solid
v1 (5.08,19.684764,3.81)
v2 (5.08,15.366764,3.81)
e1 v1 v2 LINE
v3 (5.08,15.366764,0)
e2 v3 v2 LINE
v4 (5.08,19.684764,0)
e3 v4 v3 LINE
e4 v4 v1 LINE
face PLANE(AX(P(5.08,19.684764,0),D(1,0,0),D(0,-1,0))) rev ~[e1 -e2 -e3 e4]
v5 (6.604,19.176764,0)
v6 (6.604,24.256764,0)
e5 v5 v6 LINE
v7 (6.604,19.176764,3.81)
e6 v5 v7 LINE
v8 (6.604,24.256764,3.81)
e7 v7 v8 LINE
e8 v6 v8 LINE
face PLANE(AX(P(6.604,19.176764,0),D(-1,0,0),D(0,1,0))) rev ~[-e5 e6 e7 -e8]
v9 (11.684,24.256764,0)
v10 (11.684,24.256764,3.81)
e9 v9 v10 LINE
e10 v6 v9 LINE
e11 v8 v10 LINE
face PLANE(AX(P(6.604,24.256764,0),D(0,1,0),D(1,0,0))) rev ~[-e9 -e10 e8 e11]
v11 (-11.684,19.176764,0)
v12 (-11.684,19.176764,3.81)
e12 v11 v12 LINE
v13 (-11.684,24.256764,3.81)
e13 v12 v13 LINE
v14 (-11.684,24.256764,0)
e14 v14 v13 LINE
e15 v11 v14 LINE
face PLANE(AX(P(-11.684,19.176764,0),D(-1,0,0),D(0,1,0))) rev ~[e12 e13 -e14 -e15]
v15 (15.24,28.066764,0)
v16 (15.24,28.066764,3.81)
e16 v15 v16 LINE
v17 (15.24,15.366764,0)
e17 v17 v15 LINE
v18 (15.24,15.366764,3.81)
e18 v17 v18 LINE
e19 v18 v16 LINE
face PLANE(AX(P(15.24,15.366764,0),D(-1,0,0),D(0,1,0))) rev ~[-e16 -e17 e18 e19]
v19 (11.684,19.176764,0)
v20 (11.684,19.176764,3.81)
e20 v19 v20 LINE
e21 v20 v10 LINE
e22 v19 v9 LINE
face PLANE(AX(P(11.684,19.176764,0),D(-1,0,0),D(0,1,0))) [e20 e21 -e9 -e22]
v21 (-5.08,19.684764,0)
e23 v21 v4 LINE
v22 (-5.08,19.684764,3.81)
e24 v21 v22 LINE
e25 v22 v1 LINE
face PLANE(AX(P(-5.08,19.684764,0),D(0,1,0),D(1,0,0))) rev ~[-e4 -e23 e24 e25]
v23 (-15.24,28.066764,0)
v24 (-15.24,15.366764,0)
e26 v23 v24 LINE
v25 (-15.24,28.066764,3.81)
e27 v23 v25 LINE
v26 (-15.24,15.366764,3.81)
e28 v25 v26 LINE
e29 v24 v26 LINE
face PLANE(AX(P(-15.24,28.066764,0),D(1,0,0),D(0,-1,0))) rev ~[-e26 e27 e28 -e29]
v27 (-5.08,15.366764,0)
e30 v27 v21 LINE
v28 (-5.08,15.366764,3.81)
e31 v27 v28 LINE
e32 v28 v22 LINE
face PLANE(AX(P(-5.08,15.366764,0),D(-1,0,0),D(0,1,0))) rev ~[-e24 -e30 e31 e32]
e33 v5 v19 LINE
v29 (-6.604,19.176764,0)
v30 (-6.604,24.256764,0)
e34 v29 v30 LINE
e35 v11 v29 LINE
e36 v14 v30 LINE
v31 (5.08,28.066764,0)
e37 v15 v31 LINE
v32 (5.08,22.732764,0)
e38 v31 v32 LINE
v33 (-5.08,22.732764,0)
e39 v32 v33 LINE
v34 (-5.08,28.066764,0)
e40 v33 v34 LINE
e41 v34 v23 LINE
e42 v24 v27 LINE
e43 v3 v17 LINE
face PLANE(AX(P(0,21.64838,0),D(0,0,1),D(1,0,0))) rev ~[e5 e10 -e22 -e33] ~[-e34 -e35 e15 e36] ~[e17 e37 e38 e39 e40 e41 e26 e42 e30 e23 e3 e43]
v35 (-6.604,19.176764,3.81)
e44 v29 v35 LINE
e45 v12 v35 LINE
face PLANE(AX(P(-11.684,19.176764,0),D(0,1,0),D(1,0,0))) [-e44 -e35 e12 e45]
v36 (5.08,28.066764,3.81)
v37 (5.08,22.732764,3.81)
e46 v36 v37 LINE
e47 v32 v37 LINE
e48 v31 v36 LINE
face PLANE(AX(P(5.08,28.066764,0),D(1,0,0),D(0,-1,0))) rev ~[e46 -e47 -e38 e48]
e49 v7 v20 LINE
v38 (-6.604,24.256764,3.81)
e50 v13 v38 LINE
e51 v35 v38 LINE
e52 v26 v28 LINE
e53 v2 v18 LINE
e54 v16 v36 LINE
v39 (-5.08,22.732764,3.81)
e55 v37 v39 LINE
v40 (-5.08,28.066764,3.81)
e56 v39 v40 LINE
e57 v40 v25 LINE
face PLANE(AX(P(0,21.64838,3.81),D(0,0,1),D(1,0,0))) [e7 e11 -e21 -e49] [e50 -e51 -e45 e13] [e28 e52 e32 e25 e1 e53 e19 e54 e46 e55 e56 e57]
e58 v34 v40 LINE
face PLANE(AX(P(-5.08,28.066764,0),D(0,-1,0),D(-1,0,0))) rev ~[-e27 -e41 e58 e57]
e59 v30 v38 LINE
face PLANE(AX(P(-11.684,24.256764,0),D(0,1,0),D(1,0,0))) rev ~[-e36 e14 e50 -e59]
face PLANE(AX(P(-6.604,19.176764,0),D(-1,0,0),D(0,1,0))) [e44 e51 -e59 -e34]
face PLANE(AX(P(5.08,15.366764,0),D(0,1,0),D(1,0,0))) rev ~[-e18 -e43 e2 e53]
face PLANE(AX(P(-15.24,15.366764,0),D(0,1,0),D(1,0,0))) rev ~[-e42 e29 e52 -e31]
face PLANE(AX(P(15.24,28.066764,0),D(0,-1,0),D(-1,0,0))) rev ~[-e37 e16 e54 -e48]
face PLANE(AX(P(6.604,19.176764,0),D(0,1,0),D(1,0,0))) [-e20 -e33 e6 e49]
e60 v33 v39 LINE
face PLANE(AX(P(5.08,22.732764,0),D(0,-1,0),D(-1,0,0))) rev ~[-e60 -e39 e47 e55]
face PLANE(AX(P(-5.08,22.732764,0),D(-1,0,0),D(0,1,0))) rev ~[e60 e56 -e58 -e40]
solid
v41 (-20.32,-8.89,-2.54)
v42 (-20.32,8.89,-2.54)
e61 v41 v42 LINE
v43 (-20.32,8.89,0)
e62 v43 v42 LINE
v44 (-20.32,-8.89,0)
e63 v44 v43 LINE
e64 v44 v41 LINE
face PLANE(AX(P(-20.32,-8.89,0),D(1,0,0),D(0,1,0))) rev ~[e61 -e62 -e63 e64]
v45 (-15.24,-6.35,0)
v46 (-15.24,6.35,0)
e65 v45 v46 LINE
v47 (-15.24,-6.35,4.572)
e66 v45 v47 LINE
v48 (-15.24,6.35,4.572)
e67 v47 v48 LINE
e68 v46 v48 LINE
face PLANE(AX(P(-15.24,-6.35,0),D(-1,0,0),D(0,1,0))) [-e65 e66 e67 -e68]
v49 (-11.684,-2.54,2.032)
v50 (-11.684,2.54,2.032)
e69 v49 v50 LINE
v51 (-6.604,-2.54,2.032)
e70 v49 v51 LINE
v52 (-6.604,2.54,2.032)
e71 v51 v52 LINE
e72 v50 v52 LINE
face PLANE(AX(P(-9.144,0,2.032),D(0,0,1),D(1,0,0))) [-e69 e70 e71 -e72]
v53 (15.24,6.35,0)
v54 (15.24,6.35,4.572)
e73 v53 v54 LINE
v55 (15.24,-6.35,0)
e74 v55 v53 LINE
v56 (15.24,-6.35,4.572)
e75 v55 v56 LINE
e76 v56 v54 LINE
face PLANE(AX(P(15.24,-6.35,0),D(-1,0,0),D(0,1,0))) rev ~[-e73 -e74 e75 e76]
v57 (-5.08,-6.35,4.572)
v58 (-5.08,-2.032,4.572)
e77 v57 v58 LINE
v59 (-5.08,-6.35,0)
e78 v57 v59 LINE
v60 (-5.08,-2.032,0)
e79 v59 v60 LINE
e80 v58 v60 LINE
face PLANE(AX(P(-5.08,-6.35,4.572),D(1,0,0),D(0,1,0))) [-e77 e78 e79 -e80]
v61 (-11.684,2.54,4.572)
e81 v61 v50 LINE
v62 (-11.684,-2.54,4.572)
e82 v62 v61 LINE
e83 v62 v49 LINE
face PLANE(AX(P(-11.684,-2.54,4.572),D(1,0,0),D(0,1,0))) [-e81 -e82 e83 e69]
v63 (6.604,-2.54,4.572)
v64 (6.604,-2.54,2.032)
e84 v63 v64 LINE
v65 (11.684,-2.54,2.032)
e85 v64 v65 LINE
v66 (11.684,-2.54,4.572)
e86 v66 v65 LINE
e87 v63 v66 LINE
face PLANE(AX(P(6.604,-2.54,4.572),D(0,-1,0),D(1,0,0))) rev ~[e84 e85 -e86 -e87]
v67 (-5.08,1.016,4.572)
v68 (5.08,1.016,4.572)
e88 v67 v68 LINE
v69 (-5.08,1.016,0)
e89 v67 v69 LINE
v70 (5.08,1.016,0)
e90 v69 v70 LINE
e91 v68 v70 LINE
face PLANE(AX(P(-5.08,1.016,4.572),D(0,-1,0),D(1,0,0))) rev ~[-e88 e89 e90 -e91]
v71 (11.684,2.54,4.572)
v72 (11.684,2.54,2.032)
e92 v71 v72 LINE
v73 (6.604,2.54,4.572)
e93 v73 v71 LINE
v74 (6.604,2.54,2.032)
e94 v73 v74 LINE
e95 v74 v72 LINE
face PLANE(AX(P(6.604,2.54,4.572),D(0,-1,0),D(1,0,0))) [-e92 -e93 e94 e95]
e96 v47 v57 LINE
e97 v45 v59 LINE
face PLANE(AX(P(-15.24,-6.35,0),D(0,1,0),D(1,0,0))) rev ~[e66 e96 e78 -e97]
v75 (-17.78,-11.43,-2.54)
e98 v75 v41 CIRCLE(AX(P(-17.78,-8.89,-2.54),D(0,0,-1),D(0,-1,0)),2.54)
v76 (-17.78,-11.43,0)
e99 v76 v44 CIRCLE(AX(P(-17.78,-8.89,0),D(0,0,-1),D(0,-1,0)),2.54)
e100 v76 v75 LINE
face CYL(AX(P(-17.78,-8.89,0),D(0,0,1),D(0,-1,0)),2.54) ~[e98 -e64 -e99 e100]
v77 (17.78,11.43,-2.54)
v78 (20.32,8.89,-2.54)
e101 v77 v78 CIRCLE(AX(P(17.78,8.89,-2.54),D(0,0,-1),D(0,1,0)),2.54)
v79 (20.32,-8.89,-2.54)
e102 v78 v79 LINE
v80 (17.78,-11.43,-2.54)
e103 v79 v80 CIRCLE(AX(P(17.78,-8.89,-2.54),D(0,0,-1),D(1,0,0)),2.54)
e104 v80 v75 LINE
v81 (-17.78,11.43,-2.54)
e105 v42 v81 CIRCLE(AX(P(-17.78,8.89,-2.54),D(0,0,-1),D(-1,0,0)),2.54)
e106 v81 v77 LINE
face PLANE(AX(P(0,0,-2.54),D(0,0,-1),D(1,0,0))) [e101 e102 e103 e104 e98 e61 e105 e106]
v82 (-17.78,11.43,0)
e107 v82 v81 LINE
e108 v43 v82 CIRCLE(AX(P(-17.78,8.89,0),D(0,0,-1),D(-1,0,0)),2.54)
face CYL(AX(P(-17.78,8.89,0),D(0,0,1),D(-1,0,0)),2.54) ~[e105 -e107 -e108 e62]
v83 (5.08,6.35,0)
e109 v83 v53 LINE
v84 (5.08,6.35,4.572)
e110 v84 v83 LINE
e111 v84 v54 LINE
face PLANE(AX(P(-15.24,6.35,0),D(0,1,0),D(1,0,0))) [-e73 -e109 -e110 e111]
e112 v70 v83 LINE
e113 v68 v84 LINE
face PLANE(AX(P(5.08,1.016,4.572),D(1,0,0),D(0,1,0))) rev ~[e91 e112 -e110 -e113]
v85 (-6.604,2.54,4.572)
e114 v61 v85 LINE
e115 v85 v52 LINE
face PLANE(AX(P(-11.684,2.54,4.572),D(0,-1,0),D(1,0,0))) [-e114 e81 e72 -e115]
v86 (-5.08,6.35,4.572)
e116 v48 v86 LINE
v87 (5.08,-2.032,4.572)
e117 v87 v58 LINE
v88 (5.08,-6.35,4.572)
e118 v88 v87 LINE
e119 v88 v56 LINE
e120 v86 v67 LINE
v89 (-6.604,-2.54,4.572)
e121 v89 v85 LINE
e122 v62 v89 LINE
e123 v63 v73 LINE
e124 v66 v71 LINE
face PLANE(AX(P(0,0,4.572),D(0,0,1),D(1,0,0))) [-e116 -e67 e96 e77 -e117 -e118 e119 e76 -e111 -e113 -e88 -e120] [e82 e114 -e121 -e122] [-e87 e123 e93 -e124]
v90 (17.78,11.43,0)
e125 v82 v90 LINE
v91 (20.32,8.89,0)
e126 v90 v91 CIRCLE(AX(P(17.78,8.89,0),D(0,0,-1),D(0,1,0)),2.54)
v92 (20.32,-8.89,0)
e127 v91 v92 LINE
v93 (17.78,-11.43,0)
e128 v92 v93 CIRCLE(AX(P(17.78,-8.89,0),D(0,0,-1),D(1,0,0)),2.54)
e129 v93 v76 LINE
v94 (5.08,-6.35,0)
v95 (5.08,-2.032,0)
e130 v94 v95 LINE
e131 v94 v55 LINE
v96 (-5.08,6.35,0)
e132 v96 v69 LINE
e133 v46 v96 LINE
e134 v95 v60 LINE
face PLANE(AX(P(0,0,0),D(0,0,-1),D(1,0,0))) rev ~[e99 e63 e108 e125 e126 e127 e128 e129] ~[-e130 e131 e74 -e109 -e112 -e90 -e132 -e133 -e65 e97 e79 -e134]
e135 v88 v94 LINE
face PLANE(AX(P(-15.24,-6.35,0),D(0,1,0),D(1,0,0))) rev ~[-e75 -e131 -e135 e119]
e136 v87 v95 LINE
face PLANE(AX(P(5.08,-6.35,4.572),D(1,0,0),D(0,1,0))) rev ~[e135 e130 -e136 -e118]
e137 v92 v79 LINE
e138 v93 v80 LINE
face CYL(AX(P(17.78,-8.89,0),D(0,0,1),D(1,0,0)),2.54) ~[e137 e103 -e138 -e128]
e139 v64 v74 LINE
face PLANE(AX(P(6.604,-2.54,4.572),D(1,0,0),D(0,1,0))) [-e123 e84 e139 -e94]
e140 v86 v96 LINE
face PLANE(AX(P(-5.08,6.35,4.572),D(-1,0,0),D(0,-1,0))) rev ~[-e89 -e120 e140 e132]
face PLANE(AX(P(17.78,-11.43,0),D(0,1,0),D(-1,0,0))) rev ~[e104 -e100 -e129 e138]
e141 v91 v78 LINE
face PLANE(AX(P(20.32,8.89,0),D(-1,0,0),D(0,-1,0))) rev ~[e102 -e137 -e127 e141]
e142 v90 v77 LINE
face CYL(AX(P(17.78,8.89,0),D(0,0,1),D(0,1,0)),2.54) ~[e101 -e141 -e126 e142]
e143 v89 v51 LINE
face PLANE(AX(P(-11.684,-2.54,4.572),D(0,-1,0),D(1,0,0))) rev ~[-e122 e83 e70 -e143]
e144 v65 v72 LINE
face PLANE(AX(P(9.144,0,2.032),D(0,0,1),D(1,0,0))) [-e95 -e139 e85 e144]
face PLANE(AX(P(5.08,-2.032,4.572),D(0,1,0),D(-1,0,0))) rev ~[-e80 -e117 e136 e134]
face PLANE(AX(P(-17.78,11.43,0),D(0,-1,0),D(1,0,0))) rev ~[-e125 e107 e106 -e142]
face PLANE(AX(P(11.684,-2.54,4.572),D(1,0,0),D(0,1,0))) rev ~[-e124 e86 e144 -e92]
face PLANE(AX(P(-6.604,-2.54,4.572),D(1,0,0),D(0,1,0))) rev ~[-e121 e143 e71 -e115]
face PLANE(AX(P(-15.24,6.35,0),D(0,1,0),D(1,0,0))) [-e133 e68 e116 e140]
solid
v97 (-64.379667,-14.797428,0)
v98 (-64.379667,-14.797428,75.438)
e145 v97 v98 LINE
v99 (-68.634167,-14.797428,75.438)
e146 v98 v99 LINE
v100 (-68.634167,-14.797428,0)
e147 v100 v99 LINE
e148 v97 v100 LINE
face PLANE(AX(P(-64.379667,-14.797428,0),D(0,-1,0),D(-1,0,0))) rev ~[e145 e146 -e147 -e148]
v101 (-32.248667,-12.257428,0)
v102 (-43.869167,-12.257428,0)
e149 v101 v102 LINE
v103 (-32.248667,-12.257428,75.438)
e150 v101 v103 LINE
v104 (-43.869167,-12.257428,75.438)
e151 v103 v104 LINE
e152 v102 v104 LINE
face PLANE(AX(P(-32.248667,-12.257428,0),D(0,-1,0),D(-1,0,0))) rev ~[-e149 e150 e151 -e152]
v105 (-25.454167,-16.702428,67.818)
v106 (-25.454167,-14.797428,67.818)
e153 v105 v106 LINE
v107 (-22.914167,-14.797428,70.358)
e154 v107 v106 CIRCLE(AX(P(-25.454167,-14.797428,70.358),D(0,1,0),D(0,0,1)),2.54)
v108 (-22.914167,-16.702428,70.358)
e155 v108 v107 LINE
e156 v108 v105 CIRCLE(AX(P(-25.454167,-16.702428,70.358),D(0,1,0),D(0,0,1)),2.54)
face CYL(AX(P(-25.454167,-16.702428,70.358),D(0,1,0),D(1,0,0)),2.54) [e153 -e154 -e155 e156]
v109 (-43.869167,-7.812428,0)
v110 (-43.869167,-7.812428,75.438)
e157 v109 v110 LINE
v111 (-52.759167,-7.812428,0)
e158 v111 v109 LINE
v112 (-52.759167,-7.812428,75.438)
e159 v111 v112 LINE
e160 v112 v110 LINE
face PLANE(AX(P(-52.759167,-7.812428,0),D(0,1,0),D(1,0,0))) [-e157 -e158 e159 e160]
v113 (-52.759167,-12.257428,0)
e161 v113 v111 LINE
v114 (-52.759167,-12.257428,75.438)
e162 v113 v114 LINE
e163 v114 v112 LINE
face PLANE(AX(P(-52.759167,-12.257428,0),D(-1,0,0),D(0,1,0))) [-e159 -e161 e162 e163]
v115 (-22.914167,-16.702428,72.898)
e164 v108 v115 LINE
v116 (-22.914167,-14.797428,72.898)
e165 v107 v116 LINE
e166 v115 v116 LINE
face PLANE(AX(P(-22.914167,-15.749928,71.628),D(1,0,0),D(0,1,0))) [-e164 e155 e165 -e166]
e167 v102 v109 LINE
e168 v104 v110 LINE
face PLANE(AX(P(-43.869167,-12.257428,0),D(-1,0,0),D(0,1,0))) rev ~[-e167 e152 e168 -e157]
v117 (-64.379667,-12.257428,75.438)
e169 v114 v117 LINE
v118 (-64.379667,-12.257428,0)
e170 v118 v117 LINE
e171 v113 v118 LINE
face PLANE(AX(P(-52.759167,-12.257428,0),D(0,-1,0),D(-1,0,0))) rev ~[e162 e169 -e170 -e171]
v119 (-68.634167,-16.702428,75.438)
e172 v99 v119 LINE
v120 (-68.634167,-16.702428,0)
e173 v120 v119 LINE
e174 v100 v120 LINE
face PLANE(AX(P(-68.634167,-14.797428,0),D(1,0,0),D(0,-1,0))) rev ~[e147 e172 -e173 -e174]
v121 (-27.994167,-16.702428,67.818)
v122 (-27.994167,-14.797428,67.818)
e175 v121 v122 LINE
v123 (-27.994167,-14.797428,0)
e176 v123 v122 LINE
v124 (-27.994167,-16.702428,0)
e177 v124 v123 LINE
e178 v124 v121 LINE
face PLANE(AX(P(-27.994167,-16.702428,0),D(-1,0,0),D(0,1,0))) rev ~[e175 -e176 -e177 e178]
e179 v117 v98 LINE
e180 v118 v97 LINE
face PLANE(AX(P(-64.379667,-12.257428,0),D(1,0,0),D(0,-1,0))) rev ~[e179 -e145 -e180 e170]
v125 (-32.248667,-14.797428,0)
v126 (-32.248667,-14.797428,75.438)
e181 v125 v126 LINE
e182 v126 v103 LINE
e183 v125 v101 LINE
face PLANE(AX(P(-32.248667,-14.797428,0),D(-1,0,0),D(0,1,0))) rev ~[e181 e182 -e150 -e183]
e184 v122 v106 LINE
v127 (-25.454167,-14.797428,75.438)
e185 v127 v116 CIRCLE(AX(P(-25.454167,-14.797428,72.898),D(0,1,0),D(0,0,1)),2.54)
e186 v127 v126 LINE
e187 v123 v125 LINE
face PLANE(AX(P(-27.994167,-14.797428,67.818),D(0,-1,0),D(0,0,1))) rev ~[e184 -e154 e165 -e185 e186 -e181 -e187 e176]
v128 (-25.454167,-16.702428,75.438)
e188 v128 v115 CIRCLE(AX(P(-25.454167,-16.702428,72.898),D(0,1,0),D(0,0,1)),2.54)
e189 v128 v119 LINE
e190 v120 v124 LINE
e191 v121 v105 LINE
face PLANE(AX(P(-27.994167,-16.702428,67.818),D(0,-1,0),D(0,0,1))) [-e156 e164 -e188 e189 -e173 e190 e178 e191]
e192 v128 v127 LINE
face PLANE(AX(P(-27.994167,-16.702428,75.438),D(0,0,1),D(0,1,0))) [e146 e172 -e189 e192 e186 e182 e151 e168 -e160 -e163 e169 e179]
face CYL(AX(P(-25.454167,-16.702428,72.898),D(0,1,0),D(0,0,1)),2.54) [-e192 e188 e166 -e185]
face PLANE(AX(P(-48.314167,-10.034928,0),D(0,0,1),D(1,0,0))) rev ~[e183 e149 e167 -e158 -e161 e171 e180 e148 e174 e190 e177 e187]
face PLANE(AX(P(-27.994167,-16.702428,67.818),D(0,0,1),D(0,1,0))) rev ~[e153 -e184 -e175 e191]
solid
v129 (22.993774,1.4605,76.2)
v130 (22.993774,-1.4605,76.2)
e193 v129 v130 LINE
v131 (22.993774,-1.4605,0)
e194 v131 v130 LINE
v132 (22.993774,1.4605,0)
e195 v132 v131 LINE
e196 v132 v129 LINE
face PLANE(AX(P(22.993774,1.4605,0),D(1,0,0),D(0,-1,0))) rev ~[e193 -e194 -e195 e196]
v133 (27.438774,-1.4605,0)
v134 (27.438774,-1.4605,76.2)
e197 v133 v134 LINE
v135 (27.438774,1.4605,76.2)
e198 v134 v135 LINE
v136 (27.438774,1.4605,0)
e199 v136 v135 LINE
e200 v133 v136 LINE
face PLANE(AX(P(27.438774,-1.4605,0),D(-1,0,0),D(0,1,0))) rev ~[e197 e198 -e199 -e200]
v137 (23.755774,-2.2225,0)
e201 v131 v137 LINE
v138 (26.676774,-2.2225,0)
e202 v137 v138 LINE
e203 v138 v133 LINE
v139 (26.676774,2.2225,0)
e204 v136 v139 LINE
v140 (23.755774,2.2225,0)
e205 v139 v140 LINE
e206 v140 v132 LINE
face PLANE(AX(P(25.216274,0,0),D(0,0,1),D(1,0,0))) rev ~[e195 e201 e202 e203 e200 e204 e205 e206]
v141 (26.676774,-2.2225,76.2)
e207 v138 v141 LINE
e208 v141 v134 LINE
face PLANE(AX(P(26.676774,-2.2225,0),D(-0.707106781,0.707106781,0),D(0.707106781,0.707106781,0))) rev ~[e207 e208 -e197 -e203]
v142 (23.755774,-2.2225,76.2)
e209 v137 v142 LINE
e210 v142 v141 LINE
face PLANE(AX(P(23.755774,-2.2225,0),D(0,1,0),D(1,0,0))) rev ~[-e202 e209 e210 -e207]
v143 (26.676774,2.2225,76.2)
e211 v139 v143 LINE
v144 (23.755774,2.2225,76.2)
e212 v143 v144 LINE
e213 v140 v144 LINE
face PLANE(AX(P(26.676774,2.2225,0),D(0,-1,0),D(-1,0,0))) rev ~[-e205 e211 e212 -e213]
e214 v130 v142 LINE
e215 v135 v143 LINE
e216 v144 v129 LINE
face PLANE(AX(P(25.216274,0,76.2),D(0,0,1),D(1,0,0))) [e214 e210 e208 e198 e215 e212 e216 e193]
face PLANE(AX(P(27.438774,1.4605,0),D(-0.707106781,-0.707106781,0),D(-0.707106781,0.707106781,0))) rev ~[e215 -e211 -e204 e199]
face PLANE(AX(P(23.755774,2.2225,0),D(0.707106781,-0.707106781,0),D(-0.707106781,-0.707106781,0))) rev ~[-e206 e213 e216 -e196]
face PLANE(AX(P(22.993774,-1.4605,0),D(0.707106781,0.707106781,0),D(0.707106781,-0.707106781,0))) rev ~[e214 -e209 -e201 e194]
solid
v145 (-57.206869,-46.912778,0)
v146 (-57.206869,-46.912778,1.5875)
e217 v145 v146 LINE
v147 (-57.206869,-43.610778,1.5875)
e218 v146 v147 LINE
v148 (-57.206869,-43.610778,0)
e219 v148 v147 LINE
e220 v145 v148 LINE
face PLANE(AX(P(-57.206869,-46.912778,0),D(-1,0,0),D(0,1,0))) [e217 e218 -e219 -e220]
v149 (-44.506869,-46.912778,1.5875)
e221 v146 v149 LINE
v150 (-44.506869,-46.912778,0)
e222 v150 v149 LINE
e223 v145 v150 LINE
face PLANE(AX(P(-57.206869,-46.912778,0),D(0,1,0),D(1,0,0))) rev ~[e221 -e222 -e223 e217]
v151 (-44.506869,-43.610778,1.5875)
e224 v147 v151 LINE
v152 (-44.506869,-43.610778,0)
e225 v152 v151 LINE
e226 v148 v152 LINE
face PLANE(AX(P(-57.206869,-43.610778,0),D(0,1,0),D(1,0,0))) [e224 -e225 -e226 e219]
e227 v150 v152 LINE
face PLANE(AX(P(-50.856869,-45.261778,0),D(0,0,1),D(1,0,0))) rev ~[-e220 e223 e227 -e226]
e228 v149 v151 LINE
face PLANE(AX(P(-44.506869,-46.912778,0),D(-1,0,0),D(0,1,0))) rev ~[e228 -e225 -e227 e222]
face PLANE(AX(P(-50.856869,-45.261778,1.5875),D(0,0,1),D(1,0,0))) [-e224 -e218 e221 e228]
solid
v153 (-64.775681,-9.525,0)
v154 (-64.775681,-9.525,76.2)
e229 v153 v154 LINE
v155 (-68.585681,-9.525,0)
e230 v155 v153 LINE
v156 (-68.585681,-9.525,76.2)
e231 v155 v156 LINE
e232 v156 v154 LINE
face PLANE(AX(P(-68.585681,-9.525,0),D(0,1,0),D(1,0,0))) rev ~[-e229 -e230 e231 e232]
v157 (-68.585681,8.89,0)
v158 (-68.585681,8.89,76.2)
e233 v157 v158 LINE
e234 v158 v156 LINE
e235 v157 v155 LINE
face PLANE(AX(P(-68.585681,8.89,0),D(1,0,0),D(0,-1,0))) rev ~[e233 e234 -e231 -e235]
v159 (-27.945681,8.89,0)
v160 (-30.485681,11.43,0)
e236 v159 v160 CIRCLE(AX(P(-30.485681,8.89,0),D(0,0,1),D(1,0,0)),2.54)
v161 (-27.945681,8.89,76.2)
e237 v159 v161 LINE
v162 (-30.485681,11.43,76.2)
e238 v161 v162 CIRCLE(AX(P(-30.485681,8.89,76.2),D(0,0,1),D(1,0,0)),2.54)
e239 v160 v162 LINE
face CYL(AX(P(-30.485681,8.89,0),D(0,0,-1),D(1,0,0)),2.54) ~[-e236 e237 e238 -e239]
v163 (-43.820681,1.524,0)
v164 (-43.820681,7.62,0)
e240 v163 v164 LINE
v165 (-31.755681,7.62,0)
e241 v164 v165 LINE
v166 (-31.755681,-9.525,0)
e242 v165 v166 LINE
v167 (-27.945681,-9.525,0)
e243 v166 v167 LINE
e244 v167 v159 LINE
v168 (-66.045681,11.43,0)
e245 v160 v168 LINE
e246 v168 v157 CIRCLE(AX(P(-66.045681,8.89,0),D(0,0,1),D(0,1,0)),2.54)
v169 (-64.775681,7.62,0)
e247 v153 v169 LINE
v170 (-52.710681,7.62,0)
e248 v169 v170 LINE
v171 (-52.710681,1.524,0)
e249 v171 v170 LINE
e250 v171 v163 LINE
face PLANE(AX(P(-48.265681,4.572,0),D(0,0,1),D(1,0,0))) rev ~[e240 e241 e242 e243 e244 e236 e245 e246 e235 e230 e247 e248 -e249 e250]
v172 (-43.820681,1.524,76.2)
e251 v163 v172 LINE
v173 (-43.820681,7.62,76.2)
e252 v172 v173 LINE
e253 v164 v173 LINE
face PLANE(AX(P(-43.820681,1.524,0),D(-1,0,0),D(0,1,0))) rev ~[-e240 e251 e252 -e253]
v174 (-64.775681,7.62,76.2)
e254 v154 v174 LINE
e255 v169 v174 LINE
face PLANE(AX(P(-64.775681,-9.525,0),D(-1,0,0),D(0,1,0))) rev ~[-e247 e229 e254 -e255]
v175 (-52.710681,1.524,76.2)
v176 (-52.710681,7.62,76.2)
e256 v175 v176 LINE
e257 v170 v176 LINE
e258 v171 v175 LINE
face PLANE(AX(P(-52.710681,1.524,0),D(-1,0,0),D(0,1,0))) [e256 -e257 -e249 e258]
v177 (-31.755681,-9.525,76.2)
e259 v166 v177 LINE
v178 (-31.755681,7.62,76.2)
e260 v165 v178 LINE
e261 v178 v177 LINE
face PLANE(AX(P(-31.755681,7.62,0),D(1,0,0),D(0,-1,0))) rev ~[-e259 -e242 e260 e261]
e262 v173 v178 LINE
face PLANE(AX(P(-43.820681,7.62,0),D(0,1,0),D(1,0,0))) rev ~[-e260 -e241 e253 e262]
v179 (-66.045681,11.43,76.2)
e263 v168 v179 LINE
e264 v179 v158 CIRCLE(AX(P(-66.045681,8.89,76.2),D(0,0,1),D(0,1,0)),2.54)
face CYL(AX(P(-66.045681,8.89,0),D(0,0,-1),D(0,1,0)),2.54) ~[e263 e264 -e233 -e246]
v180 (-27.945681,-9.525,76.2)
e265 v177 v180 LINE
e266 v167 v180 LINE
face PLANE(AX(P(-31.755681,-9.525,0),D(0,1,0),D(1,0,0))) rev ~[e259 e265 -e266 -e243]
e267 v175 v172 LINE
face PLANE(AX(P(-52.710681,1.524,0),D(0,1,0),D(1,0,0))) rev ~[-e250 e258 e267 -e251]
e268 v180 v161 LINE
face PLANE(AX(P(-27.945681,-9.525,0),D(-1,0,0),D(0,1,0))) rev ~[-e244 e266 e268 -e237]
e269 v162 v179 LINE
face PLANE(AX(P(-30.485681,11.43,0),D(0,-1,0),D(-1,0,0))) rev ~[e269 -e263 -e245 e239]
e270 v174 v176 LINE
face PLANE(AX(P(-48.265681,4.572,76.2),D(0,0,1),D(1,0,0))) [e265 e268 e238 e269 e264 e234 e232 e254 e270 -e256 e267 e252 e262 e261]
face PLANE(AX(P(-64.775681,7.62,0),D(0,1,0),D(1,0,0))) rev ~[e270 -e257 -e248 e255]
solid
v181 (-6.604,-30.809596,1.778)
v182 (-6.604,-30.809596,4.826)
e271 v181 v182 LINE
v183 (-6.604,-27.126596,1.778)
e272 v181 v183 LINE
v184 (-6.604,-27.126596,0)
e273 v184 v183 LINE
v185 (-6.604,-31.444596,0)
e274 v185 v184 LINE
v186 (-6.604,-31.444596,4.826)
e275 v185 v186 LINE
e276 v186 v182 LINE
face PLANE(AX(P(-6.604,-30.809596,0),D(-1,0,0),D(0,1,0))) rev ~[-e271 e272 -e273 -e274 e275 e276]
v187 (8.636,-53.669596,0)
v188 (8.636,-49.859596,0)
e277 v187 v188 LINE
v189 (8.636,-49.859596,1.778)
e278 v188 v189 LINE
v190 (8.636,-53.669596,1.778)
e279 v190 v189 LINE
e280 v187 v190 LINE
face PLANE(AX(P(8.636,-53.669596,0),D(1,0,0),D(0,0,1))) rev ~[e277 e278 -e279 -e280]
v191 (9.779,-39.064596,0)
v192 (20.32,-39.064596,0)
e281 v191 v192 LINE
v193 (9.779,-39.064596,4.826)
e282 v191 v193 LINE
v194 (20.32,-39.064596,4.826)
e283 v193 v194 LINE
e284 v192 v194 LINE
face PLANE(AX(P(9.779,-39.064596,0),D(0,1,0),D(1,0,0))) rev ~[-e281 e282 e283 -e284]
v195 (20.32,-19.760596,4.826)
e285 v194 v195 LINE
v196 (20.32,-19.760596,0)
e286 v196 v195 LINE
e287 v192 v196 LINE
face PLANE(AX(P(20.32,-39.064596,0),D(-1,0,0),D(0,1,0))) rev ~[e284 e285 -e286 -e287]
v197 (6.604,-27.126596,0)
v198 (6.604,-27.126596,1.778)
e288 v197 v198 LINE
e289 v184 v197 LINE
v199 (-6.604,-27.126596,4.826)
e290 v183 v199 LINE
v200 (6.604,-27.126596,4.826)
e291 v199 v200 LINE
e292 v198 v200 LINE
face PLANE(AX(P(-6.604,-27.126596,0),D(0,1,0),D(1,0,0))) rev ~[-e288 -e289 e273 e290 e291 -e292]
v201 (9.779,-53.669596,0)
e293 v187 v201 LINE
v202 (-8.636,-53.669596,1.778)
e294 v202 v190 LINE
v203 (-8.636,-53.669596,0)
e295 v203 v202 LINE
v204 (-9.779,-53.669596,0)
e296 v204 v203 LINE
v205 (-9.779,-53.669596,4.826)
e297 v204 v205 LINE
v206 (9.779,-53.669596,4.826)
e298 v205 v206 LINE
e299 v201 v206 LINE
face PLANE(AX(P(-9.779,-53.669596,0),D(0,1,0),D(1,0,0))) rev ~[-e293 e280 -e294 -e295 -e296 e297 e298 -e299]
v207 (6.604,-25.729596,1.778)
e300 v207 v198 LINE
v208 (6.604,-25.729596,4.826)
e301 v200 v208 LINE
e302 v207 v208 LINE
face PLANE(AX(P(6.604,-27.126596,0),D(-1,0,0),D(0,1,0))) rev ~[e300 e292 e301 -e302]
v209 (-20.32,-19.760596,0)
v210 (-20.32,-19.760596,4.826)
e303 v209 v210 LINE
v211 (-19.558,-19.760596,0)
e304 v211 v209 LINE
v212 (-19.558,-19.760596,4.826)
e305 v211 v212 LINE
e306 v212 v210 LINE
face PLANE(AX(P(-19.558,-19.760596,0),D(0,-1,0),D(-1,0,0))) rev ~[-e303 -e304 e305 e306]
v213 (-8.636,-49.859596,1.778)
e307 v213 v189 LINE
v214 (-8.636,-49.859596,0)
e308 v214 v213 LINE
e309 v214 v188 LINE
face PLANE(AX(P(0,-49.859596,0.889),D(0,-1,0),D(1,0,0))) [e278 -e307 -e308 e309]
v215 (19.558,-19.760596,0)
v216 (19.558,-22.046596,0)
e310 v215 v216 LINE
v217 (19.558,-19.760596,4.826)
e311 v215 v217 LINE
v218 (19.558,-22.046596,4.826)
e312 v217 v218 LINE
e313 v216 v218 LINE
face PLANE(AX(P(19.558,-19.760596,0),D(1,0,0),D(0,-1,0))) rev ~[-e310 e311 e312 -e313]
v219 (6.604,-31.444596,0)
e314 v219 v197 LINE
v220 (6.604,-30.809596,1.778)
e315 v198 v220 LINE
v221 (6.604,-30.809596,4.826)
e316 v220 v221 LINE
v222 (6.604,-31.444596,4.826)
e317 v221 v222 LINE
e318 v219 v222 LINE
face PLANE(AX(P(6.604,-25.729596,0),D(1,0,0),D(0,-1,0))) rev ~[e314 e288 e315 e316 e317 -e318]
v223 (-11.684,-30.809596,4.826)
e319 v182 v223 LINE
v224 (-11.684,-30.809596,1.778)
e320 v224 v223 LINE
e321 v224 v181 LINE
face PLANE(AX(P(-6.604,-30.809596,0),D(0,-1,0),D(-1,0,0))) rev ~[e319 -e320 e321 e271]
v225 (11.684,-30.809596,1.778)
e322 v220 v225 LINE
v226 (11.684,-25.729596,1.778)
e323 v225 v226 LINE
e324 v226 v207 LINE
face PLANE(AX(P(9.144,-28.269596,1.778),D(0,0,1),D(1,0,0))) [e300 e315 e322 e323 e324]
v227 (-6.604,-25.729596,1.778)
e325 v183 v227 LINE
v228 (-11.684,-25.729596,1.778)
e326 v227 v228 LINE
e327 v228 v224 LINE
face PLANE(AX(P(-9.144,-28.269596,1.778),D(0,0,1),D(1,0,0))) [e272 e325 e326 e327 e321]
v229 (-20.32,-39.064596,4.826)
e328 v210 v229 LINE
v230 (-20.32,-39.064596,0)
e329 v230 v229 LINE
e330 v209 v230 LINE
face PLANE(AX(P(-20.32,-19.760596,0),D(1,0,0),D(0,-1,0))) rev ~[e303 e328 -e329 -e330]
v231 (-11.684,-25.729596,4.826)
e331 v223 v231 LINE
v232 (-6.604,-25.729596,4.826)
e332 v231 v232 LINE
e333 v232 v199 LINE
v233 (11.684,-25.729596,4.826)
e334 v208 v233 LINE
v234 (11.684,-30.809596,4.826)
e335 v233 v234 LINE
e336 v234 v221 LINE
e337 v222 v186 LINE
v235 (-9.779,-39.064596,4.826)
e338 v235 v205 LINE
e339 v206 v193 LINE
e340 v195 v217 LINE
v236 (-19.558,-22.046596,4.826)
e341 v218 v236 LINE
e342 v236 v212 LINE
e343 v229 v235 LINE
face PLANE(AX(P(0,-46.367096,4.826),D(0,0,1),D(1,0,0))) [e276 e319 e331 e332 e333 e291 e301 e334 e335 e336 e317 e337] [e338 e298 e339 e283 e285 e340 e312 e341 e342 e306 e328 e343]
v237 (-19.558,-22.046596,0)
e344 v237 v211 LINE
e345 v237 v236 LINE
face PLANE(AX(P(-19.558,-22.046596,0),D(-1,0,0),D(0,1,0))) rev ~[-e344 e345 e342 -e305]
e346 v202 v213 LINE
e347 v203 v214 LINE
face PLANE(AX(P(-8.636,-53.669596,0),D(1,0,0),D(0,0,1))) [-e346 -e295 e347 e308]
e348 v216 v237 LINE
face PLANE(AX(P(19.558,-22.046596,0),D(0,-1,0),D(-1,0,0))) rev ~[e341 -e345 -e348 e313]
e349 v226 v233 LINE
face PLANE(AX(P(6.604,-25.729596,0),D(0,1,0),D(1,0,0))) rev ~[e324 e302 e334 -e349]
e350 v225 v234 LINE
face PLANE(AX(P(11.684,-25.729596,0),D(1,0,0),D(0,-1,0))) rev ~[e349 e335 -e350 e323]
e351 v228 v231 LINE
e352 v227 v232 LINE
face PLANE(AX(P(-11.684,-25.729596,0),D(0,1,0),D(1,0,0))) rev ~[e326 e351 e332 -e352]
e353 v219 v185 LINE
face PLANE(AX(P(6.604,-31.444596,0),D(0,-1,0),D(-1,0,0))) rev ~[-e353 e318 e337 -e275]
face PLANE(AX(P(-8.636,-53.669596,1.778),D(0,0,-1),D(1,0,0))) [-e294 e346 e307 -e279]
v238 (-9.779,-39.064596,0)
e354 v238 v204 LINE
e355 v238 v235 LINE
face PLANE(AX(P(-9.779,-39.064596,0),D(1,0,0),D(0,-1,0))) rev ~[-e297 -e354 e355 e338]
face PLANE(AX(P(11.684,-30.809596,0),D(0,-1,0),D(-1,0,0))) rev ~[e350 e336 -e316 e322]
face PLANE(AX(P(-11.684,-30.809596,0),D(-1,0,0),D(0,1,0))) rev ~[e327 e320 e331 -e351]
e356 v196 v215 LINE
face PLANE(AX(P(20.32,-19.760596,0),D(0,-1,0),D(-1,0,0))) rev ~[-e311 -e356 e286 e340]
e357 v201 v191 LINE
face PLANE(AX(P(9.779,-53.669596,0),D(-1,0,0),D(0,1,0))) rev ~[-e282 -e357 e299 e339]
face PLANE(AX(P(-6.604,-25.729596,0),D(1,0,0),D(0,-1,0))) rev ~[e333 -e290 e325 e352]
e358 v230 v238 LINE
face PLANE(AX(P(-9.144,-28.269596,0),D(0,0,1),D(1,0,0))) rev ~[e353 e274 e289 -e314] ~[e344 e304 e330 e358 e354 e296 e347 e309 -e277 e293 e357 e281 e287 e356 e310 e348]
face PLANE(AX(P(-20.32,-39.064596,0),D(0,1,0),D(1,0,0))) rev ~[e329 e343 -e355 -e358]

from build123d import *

# Parameters (mm, degrees)
F0_W      = 30.48
F0_H      = 12.7
F1_DEPTH  = 4.572
F2_W      = 5.08
F2_H      = 5.08
F3_DEPTH  = 2.54
F2_H_2    = 1.524
F2_H_3    = 3.81
F2_H_4    = 4.318
F4_DEPTH  = 7.62
F6_DEPTH  = 2.54
F8_DEPTH  = 76.2
F9_W      = 5.08
F9_H      = 5.08
F10_DEPTH = 3.81
F11_W     = 8.89
F11_H     = 6.096
F12_DEPTH = 76.2
F14_DEPTH = 4.826
F15_DEPTH = 1.778
F16_W     = 17.272
F16_H     = 1.778
F17_DEPTH = 3.81
F18_W     = 12.7
F18_H     = 3.302
F19_DEPTH = 1.5875
F20_W     = 8.89
F20_H     = 4.445
F21_DEPTH = 75.438
F22_W     = 1.905
F22_H     = 7.62
F23_DEPTH = 5.08
F24_R     = 2.54
F25_R     = 2.54


# Not quite as in the source:
# - a feature names something its author has since deleted; it is built from what else it names


with BuildPart() as f1:
    # F0 (on Top) → F1 (new body)
    with BuildSketch(Plane.XY):
        Rectangle(F0_W, F0_H)
    extrude(amount=F1_DEPTH)

    # F2 (on face) → F3 (cut)
    with BuildSketch(Plane.XY.offset(4.572)):
        with Locations((-9.144, 0)):
            Rectangle(F2_W, F2_H)
        with Locations((9.144, 0)):
            Rectangle(F2_W, F2_H)
    extrude(amount=-F3_DEPTH, mode=Mode.SUBTRACT)

    # F2 (on face) → F4 (cut)
    with BuildSketch(Plane.XY.offset(4.572)):
        with Locations((-2.54, 1.778)):
            Rectangle(F2_W, F2_H_2)
        with Locations((-2.54, 4.445)):
            Rectangle(F2_W, F2_H_3)
        Polygon((5.08, 6.35), (0, 6.35), (0, 2.54), (0, 1.016), (5.08, 1.016), align=None)
        with Locations((2.54, -4.191)):
            Rectangle(F2_W, F2_H_4)
        with Locations((-2.54, -4.191)):
            Rectangle(F2_W, F2_H_4)
    extrude(amount=-F4_DEPTH, mode=Mode.SUBTRACT)

    # F5 (on face) → F6 (join)
    with BuildSketch(Plane(origin=(0, 0, 0), x_dir=(1, 0, 0), z_dir=(0, 0, -1))):
        with BuildLine():
            Line((-20.32, -6.8208193406), (-20.32, -8.89))
            ThreePointArc((-20.32, -8.89), (-19.5760512242, -10.6860512242), (-17.78, -11.43))
            Line((-17.78, -11.43), (-17.2756779939, -11.43))
            Line((-17.2756779939, -11.43), (17.78, -11.43))
            ThreePointArc((17.78, -11.43), (19.5760512242, -10.6860512242), (20.32, -8.89))
            Line((20.32, -8.89), (20.32, 0))
            Line((20.32, 0), (20.32, 8.89))
            ThreePointArc((20.32, 8.89), (19.5760512242, 10.6860512242), (17.78, 11.43))
            Line((17.78, 11.43), (0, 11.43))
            Line((0, 11.43), (-17.78, 11.43))
            ThreePointArc((-17.78, 11.43), (-19.5760512242, 10.6860512242), (-20.32, 8.89))
            Line((-20.32, 8.89), (-20.32, -6.8208193406))
        make_face()
        Polygon((5.08, 6.35), (15.24, 6.35), (15.24, -6.35), (5.08, -6.35), (5.08, -1.016), (-5.08, -1.016), (-5.08, -6.35), (-15.24, -6.35), (-15.24, 6.35), (-5.08, 6.35), (-5.08, 2.032), (5.08, 2.032), align=None, mode=Mode.SUBTRACT)
        Polygon((15.24, -6.35), (15.24, 6.35), (5.08, 6.35), (5.08, 2.032), (-5.08, 2.032), (-5.08, 6.35), (-15.24, 6.35), (-15.24, -6.35), (-5.08, -6.35), (-5.08, -1.016), (5.08, -1.016), (5.08, -6.35), align=None)
    extrude(amount=F6_DEPTH)


with BuildPart() as f8:
    # F7 (on Top) → F8 (new body)
    with BuildSketch(Plane.XY):
        Polygon((27.4387739635, 1.4605), (26.6767739635, 2.2225), (23.7557739635, 2.2225), (22.9937739635, 1.4605), (22.9937739635, -1.4605), (23.7557739635, -2.2225), (25.2162739635, -2.2225), (26.6767739635, -2.2225), (27.4387739635, -1.4605), (27.4387739635, 0), align=None)
    extrude(amount=F8_DEPTH)


with BuildPart() as f10:
    # F9 (on Top) → F10 (new body)
    with BuildSketch(Plane.XY):
        Polygon((15.24, 15.3667641968), (15.24, 28.0667641968), (5.08, 28.0667641968), (5.08, 22.7327641968), (0, 22.7327641968), (-5.08, 22.7327641968), (-5.08, 24.2567641968), (-5.08, 28.0667641968), (-15.24, 28.0667641968), (-15.24, 15.3667641968), (-5.08, 15.3667641968), (-5.08, 19.6847641968), (0, 19.6847641968), (5.08, 19.6847641968), (5.08, 15.3667641968), align=None)
        with Locations((-9.144, 21.7167641968)):
            Rectangle(F9_W, F9_H, mode=Mode.SUBTRACT)
        with Locations((9.144, 21.7167641968)):
            Rectangle(F9_W, F9_H, mode=Mode.SUBTRACT)
    extrude(amount=F10_DEPTH)


with BuildPart() as f12:
    # F11 (on Top) → F12 (new body)
    with BuildSketch(Plane.XY):
        with Locations((-48.2656806707, 4.572)):
            Rectangle(F11_W, F11_H)
        with BuildLine():
            Line((-43.8206806707, 7.62), (-31.7556806707, 7.62))
            Line((-31.7556806707, 7.62), (-31.7556806707, -7.62))
            Line((-31.7556806707, -7.62), (-31.7556806707, -9.525))
            Line((-31.7556806707, -9.525), (-27.9456806707, -9.525))
            Line((-27.9456806707, -9.525), (-27.9456806707, 8.89))
            ThreePointArc((-27.9456806707, 8.89), (-28.6896294465, 10.6860512242), (-30.4856806707, 11.43))
            Line((-30.4856806707, 11.43), (-66.0456806707, 11.43))
            ThreePointArc((-66.0456806707, 11.43), (-67.841731895, 10.6860512242), (-68.5856806707, 8.89))
            Line((-68.5856806707, 8.89), (-68.5856806707, -9.525))
            Line((-68.5856806707, -9.525), (-64.7756806707, -9.525))
            Line((-64.7756806707, -9.525), (-64.7756806707, -7.62))
            Line((-64.7756806707, -7.62), (-64.7756806707, 7.62))
            Line((-64.7756806707, 7.62), (-52.7106806707, 7.62))
            Line((-52.7106806707, 7.62), (-43.8206806707, 7.62))
        make_face()
    extrude(amount=F12_DEPTH)


with BuildPart() as f14:
    # F13 (on Top) → F14 (new body)
    with BuildSketch(Plane.XY):
        Polygon((9.779, -53.6695963979), (9.779, -39.0645963979), (0, -39.0645963979), (-9.779, -39.0645963979), (-9.779, -53.6695963979), align=None)
        Polygon((-19.558, -22.0465963979), (-19.558, -19.7605963979), (-20.32, -19.7605963979), (-20.32, -39.0645963979), (-9.779, -39.0645963979), (0, -39.0645963979), (0, -31.4445963979), (-6.604, -31.4445963979), (-6.604, -30.8095963979), (-11.684, -30.8095963979), (-11.684, -25.7295963979), (-6.604, -25.7295963979), (-6.604, -27.1265963979), (0, -27.1265963979), (0, -22.0465963979), align=None)
        Polygon((20.32, -39.0645963979), (20.32, -19.7605963979), (19.558, -19.7605963979), (19.558, -22.0465963979), (0, -22.0465963979), (0, -27.1265963979), (6.604, -27.1265963979), (6.604, -25.7295963979), (11.684, -25.7295963979), (11.684, -30.8095963979), (6.604, -30.8095963979), (6.604, -31.4445963979), (0, -31.4445963979), (0, -39.0645963979), (9.779, -39.0645963979), align=None)
    extrude(amount=F14_DEPTH)

    # F13 (on Top) → F15 (join)
    with BuildSketch(Plane.XY):
        Polygon((-6.604, -28.2695963979), (-6.604, -27.1265963979), (-6.604, -25.7295963979), (-11.684, -25.7295963979), (-11.684, -30.8095963979), (-6.604, -30.8095963979), align=None)
        Polygon((6.604, -25.7295963979), (6.604, -27.1265963979), (6.604, -30.8095963979), (11.684, -30.8095963979), (11.684, -25.7295963979), align=None)
    extrude(amount=F15_DEPTH)

    # F16 (on face) → F17 (cut)
    with BuildSketch(Plane.XZ.offset(53.6695963979)):
        with Locations((0, 0.889)):
            Rectangle(F16_W, F16_H)
    extrude(amount=-F17_DEPTH, mode=Mode.SUBTRACT)


with BuildPart() as f19:
    # F18 (on Top) → F19 (new body)
    with BuildSketch(Plane.XY):
        with Locations((-50.8568691254, -45.2617781689)):
            Rectangle(F18_W, F18_H)
    extrude(amount=F19_DEPTH)


with BuildPart() as f21:
    # F20 (on Top) → F21 (new body)
    with BuildSketch(Plane.XY):
        with Locations((-48.3141668069, -10.0349279085)):
            Rectangle(F20_W, F20_H)
        Polygon((-64.3796668069, -14.7974279085), (-32.2486668069, -14.7974279085), (-32.2486668069, -12.2574279085), (-43.8691668069, -12.2574279085), (-52.7591668069, -12.2574279085), (-64.3796668069, -12.2574279085), align=None)
        Polygon((-68.6341668069, -16.7024279085), (-27.9941668069, -16.7024279085), (-27.9941668069, -14.7974279085), (-32.2486668069, -14.7974279085), (-64.3796668069, -14.7974279085), (-68.6341668069, -14.7974279085), align=None)
    extrude(amount=F21_DEPTH)

    # F22 (on face) → F23 (join)
    with BuildSketch(Plane.YZ.offset(-27.9941668069)):
        with Locations((-15.7499279085, 71.628)):
            Rectangle(F22_W, F22_H)
    extrude(amount=F23_DEPTH)

    # F24
    f24_edges = [f21.edges().sort_by_distance(p)[0] for p in [
        (-22.914167, -15.749928, 75.438),
    ]]
    fillet(f24_edges, radius=F24_R)

    # F25
    f25_edges = [f21.edges().sort_by_distance(p)[0] for p in [
        (-22.914167, -15.749928, 67.818),
    ]]
    fillet(f25_edges, radius=F25_R)


solid = Compound([f1.part, f8.part, f10.part, f12.part, f14.part, f19.part, f21.part])
